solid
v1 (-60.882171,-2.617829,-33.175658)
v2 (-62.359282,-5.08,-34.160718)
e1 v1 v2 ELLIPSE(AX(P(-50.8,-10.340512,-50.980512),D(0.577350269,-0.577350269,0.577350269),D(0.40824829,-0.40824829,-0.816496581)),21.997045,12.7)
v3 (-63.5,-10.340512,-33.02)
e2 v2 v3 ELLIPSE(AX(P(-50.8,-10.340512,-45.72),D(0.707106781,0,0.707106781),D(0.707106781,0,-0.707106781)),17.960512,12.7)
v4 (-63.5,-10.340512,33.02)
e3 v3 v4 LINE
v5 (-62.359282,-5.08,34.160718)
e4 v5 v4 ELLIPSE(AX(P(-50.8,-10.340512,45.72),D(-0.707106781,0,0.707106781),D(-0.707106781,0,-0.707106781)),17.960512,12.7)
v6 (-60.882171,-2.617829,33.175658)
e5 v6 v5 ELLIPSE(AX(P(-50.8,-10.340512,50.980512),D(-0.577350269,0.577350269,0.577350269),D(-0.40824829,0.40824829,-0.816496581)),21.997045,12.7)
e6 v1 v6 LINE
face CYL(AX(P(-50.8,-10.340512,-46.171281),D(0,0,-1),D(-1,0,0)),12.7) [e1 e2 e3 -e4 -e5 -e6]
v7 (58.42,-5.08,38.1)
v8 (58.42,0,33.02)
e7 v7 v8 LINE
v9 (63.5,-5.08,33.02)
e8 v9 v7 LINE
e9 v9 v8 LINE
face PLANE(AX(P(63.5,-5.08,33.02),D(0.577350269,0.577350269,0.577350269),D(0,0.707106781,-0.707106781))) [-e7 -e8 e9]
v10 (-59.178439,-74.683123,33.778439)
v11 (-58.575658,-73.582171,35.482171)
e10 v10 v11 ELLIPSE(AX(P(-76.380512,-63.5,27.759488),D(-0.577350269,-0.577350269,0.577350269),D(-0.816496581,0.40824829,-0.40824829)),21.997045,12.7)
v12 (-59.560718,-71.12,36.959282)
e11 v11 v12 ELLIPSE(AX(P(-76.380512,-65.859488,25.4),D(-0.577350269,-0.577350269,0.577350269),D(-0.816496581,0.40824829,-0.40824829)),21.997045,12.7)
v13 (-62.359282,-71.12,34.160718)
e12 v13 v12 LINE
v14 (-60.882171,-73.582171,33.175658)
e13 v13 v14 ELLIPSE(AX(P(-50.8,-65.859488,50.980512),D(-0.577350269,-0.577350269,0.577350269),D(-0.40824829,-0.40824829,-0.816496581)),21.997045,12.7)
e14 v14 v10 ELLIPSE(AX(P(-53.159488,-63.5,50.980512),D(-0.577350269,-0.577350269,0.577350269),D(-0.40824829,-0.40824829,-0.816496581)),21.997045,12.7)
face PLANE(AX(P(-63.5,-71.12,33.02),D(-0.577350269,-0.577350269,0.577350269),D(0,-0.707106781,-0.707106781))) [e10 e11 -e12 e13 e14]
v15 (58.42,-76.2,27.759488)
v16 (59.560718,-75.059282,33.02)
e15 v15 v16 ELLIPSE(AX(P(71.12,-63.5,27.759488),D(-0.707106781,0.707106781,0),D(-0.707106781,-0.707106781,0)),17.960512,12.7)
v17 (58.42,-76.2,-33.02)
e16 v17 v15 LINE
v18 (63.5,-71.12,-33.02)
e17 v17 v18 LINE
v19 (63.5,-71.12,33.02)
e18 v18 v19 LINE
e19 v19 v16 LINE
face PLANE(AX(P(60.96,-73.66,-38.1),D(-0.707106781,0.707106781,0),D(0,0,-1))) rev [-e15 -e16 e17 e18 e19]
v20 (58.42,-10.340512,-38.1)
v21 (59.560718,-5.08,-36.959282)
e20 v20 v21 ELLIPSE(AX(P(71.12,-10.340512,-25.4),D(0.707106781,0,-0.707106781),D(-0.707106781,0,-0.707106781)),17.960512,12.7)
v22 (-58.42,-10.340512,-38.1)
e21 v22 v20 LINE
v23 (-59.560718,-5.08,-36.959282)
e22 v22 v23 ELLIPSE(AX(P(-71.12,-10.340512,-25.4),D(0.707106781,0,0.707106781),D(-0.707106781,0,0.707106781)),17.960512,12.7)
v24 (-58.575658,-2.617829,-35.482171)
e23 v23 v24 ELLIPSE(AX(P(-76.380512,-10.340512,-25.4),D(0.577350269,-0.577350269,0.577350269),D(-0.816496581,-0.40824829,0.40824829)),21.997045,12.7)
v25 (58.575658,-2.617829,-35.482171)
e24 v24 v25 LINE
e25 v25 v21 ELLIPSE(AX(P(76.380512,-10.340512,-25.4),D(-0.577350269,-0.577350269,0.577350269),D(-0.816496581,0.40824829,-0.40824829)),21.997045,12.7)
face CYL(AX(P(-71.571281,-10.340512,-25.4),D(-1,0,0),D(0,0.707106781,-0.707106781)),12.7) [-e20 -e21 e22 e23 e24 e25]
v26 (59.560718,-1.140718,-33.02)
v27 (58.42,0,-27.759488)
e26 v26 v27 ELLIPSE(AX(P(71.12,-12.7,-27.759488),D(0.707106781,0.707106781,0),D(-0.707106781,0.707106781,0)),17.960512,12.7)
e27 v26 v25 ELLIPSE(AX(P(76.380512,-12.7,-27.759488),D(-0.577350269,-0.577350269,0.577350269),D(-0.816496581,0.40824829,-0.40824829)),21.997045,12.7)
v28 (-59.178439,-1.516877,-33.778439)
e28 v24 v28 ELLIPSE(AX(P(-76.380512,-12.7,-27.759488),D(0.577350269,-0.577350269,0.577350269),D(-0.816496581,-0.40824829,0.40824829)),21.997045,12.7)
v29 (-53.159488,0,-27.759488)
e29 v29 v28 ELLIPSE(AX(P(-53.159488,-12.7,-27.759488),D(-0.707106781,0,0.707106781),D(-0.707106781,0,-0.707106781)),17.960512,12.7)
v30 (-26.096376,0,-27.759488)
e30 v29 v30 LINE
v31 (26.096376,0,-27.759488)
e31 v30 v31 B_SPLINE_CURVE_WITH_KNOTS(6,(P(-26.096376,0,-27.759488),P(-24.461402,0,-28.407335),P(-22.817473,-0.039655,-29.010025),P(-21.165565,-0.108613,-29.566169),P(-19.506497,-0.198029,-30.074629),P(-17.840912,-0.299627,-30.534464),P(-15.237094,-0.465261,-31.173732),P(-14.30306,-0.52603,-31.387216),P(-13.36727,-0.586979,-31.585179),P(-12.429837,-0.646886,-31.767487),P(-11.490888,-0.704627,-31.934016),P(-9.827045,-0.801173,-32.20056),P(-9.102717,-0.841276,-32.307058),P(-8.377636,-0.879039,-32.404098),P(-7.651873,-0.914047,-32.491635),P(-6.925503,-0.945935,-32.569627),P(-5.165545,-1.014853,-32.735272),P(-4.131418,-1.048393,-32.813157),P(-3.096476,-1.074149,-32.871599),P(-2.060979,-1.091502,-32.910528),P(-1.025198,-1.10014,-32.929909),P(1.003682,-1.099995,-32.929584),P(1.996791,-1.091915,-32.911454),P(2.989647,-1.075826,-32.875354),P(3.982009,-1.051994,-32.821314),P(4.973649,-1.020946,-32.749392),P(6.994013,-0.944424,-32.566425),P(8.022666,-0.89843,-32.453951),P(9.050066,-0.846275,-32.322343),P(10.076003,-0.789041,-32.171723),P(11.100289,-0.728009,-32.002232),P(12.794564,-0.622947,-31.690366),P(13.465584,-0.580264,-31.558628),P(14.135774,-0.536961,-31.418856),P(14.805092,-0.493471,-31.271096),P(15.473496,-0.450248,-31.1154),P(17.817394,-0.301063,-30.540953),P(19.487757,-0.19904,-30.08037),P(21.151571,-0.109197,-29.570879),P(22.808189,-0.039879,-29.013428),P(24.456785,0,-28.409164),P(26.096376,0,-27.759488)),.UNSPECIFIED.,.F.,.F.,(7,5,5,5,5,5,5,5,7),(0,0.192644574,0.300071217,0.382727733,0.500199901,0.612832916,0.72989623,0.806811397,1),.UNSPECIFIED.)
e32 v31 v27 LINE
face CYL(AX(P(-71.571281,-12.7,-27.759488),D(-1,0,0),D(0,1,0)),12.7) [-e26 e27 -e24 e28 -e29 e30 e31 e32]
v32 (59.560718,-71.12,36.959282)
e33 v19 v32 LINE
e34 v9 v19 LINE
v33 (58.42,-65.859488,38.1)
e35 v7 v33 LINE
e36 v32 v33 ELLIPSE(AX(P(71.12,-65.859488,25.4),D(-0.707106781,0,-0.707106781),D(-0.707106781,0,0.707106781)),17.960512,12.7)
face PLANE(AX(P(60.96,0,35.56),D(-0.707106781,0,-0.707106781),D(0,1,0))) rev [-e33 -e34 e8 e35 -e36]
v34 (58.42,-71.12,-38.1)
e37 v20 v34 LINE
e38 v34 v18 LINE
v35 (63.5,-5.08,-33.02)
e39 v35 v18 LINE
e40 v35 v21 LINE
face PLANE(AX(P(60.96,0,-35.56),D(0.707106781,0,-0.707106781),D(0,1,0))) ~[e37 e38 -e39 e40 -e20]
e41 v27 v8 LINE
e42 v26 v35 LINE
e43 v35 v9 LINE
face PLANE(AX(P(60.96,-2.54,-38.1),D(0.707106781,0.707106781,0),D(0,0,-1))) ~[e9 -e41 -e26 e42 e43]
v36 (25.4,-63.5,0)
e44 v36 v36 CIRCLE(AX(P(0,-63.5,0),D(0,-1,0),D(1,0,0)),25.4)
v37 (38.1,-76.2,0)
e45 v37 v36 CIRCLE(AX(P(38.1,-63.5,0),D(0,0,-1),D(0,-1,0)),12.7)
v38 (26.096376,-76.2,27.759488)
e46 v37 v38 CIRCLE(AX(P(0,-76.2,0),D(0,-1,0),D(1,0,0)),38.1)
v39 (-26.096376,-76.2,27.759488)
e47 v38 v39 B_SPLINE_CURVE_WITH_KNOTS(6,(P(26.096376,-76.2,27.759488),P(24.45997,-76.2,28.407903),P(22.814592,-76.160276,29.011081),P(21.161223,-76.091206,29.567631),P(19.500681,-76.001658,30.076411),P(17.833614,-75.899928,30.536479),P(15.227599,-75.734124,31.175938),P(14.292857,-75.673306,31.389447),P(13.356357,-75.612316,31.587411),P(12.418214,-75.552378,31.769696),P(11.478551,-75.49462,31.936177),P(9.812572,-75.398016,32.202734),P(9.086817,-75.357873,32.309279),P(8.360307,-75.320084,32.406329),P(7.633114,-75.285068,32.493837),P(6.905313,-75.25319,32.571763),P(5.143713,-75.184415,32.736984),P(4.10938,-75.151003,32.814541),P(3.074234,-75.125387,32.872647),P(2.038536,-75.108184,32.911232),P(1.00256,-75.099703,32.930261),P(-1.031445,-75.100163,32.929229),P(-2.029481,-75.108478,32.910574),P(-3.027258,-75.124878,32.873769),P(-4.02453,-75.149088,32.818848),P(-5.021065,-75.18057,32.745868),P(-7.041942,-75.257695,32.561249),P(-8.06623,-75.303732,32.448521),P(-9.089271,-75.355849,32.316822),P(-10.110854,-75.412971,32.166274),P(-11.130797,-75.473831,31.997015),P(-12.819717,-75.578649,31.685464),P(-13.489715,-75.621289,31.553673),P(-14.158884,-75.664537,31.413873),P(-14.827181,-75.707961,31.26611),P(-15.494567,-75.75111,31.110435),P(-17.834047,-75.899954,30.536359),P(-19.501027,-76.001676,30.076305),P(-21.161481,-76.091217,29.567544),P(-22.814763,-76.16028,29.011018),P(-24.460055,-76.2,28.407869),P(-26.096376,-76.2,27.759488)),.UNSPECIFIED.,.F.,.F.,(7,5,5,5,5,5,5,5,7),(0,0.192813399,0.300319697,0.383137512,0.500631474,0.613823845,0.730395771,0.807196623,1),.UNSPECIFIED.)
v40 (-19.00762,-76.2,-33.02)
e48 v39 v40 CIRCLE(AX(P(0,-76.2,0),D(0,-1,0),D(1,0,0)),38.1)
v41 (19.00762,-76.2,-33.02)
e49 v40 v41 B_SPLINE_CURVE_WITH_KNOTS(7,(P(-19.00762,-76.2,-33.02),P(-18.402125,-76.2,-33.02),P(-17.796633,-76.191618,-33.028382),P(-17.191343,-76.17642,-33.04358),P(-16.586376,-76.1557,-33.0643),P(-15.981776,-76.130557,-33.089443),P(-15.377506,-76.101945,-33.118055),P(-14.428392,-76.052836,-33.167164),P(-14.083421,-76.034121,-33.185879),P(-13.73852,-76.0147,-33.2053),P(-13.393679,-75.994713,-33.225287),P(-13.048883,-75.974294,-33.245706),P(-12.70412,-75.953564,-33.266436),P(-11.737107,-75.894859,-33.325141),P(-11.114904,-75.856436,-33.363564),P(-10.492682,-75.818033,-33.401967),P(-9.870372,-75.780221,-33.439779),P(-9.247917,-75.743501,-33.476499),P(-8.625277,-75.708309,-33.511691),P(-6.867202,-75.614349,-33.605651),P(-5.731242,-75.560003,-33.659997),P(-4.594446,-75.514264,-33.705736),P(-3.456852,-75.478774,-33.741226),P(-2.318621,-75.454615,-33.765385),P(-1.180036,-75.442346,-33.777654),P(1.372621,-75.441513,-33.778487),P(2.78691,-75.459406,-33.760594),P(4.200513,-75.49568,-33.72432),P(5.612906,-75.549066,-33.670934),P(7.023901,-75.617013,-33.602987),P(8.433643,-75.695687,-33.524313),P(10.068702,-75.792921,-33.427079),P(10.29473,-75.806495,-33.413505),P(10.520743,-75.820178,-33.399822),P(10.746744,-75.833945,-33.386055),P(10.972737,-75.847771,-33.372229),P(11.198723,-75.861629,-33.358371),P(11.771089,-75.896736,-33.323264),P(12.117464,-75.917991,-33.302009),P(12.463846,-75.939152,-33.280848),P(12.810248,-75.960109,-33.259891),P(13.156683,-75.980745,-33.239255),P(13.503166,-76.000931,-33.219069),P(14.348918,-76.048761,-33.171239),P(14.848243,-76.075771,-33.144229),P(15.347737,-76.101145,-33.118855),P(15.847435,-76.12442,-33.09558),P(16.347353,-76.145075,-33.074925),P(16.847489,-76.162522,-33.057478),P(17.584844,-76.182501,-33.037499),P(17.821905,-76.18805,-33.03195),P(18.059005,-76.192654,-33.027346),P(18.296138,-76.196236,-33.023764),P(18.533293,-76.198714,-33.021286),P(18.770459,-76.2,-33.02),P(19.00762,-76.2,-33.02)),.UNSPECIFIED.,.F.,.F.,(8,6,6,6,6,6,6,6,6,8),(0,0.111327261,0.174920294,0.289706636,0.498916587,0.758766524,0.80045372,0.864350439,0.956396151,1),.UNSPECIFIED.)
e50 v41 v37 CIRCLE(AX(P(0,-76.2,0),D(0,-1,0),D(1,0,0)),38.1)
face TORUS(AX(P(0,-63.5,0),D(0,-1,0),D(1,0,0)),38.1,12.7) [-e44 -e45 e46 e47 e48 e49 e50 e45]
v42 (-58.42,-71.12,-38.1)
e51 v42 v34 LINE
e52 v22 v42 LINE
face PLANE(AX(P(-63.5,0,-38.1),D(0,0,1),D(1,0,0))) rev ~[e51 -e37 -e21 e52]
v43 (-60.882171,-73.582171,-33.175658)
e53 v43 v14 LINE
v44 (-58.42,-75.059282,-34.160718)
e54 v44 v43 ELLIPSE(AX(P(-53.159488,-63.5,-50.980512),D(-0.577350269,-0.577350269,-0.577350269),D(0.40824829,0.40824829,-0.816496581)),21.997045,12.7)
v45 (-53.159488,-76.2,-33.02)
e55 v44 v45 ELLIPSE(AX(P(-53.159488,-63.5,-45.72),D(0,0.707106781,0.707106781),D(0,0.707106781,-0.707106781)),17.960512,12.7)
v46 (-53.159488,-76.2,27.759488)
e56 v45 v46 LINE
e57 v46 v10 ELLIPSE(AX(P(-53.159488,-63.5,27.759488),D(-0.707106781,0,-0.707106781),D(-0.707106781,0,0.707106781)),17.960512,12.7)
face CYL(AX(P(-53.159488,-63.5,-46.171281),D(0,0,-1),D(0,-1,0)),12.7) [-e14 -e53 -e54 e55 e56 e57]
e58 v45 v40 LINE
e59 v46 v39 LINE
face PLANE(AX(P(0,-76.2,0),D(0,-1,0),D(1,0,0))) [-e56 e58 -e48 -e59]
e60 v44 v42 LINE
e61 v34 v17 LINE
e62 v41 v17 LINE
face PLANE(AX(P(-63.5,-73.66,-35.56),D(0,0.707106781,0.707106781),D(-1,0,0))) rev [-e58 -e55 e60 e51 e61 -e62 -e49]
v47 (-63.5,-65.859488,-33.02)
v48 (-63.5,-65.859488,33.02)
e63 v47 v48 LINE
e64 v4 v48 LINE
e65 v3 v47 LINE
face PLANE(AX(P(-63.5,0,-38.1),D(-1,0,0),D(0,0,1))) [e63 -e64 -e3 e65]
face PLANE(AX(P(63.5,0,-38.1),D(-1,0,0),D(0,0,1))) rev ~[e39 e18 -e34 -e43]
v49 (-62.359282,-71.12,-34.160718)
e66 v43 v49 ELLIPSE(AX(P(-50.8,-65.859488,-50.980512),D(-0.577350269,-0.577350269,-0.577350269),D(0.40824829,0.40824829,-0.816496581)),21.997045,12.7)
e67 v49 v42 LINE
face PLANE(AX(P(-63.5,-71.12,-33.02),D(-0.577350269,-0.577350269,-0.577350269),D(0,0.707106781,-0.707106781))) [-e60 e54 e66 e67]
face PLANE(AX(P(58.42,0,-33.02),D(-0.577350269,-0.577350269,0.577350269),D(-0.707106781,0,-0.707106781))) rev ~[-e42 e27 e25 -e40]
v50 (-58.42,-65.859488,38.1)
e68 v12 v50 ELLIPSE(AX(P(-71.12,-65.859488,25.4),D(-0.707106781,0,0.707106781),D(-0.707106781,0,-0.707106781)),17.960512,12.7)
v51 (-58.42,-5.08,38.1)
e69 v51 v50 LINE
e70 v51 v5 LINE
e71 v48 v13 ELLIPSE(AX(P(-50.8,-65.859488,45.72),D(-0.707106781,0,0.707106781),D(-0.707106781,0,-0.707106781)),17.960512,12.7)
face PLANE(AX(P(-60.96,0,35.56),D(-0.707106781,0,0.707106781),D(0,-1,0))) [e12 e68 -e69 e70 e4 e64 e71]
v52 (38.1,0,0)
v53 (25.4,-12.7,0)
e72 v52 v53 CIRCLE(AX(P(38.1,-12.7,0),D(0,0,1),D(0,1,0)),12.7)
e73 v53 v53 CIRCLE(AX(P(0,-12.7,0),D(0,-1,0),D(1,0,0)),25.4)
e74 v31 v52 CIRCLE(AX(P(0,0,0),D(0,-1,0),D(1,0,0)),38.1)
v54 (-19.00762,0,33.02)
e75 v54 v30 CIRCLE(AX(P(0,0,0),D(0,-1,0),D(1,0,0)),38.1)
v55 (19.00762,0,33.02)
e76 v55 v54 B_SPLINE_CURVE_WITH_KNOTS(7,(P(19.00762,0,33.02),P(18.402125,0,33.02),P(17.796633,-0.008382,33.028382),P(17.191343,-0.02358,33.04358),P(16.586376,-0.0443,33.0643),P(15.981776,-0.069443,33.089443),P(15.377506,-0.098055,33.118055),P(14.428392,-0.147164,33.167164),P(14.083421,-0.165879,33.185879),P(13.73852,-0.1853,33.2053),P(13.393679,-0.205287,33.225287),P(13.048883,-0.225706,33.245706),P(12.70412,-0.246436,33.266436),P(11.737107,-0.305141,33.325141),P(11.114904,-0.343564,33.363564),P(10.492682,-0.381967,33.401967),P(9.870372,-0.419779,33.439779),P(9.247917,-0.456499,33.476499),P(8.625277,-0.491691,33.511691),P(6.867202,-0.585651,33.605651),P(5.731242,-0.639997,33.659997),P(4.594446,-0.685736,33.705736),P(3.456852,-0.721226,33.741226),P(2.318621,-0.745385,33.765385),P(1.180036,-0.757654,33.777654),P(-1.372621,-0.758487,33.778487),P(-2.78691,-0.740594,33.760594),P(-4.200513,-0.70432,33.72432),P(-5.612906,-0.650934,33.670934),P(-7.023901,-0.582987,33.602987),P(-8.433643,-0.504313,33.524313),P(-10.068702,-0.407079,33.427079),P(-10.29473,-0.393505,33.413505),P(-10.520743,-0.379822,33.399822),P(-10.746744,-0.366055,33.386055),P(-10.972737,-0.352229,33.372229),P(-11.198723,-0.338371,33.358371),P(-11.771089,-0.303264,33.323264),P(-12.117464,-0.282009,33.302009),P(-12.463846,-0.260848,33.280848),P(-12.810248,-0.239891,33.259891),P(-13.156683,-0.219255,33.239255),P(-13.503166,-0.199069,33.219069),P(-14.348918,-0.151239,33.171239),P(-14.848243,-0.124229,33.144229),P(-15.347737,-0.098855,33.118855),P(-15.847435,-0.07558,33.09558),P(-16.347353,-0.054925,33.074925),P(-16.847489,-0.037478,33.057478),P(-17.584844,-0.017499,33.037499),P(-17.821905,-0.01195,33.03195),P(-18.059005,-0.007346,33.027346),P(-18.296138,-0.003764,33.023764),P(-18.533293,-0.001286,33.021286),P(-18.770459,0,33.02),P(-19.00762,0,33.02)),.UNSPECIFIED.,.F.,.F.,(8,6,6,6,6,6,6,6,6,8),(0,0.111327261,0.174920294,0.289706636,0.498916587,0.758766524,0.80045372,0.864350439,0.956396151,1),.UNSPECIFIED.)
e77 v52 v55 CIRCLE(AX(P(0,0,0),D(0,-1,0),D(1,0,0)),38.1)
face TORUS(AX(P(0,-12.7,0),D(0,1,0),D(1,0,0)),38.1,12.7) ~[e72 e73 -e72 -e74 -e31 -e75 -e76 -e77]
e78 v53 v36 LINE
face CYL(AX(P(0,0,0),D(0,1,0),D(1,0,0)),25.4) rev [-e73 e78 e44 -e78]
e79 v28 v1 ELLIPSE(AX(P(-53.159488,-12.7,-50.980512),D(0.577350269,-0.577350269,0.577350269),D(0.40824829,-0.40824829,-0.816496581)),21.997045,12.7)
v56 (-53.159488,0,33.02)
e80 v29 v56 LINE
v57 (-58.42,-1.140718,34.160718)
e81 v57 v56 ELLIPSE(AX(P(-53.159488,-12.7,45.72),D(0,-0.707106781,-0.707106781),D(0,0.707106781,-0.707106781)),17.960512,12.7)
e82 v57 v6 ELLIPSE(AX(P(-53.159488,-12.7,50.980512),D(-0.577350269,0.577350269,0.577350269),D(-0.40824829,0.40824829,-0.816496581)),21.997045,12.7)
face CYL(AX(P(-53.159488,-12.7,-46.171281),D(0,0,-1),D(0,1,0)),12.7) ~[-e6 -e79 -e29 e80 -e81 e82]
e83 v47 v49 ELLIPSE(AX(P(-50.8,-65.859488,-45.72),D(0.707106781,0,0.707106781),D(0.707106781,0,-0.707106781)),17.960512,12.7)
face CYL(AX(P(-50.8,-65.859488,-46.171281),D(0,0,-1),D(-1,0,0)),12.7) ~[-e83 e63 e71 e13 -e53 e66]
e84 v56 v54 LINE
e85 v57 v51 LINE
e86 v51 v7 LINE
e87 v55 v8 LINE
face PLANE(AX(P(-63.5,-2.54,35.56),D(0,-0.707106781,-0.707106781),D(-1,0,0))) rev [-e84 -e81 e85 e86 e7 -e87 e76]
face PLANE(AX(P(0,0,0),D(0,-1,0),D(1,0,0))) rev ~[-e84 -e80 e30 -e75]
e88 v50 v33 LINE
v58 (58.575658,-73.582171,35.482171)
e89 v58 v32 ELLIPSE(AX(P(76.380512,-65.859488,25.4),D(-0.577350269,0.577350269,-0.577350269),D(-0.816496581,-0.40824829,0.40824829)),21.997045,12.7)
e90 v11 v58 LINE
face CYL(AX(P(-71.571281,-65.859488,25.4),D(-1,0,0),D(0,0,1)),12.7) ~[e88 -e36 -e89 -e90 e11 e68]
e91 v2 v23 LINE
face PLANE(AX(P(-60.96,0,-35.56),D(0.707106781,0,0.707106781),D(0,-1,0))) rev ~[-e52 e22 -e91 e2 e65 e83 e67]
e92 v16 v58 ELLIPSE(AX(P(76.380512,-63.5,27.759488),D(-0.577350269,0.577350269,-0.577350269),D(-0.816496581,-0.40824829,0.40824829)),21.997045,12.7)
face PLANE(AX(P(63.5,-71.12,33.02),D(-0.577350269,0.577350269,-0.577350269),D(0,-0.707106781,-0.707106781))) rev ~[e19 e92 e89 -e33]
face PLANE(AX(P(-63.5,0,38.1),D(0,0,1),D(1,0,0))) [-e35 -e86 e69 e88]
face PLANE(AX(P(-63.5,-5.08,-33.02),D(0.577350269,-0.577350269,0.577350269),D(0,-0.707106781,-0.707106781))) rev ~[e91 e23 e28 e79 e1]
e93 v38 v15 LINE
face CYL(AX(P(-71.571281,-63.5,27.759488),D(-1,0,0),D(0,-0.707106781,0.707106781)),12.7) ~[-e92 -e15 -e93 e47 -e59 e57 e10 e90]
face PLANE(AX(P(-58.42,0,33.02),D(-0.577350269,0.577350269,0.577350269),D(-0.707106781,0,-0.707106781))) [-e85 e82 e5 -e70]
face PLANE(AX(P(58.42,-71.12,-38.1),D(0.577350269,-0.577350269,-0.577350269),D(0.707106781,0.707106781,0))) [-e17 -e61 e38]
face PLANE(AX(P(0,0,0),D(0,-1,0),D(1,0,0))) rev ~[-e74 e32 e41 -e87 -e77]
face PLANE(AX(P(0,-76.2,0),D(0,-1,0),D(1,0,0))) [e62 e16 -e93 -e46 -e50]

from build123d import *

# Parameters (mm, degrees)
F0_W        = 127
F0_H        = 76.2
F0_R        = 25.4
F1_DEPTH    = 76.2
F2_SIZE     = 5.08
F3_T1_DEPTH = 143.1425612107
F3_T3_DEPTH = 92.3425612107


# Not quite as in the source:
# - a fillet or chamfer that OpenCascade refuses, or shapes differently, is made with other operations: its cross-section is extruded or revolved along the edge and cut away or added


with BuildPart() as f1:
    # F0 (on Front) → F1 (new body)
    with BuildSketch(Plane.XZ):
        Rectangle(F0_W, F0_H)
        Circle(F0_R, mode=Mode.SUBTRACT)
    extrude(amount=F1_DEPTH)

    # F2
    f2_edges = [f1.edges().sort_by_distance(p)[0] for p in [
        (0, -76.2, 38.1),
        (-63.5, -38.1, 38.1),
        (0, 0, 38.1),
        (63.5, -38.1, 38.1),
        (63.5, -76.2, 0),
        (0, -76.2, -38.1),
        (-63.5, -76.2, 0),
        (63.5, -38.1, -38.1),
        (63.5, 0, 0),
        (0, 0, -38.1),
        (-63.5, 0, 0),
        (-63.5, -38.1, -38.1),
    ]]
    chamfer(f2_edges, length=F2_SIZE)

    # F3: fillet of radius 12.7 on 10 edges, made by hand

    # F3_s2 → F3_t1 (cut)
    with BuildSketch(Plane.YZ.offset(-71.5712806053)):
        with BuildLine():
            ThreePointArc((0, -27.7594877579), (-0.9667299371, -32.6195673489), (-3.7197438789, -36.7397438789))
            Line((-3.7197438789, -36.7397438789), (0, -33.02))
            Line((0, -33.02), (0, -27.7594877579))
        make_face()
        with BuildLine():
            ThreePointArc((-1.3602561211, -34.3802561211), (-5.4804326511, -37.1332700629), (-10.3405122421, -38.1))
            Line((-10.3405122421, -38.1), (-5.08, -38.1))
            Line((-5.08, -38.1), (-1.3602561211, -34.3802561211))
        make_face()
        with BuildLine():
            ThreePointArc((-65.8594877579, 38.1), (-70.7195673489, 37.1332700629), (-74.8397438789, 34.3802561211))
            Line((-74.8397438789, 34.3802561211), (-71.12, 38.1))
            Line((-71.12, 38.1), (-65.8594877579, 38.1))
        make_face()
        with BuildLine():
            ThreePointArc((-72.4802561211, 36.7397438789), (-75.2332700629, 32.6195673489), (-76.2, 27.7594877579))
            Line((-76.2, 27.7594877579), (-76.2, 33.02))
            Line((-76.2, 33.02), (-72.4802561211, 36.7397438789))
        make_face()
    extrude(amount=F3_T1_DEPTH, mode=Mode.SUBTRACT)

    # F3_s4 → F3_t3 (cut)
    with BuildSketch(Plane.XY.offset(-46.1712806053)):
        with BuildLine():
            ThreePointArc((-63.5, -65.8594877579), (-62.5332700629, -70.7195673489), (-59.7802561211, -74.8397438789))
            Line((-59.7802561211, -74.8397438789), (-63.5, -71.12))
            Line((-63.5, -71.12), (-63.5, -65.8594877579))
        make_face()
        with BuildLine():
            ThreePointArc((-53.1594877579, -76.2), (-58.0195673489, -75.2332700629), (-62.1397438789, -72.4802561211))
            Line((-62.1397438789, -72.4802561211), (-58.42, -76.2))
            Line((-58.42, -76.2), (-53.1594877579, -76.2))
        make_face()
        with BuildLine():
            ThreePointArc((-63.5, -10.3405122421), (-62.5332700629, -5.4804326511), (-59.7802561211, -1.3602561211))
            Line((-59.7802561211, -1.3602561211), (-63.5, -5.08))
            Line((-63.5, -5.08), (-63.5, -10.3405122421))
        make_face()
        with BuildLine():
            ThreePointArc((-53.1594877579, 0), (-58.0195673489, -0.9667299371), (-62.1397438789, -3.7197438789))
            Line((-62.1397438789, -3.7197438789), (-58.42, 0))
            Line((-58.42, 0), (-53.1594877579, 0))
        make_face()
    extrude(amount=F3_T3_DEPTH, mode=Mode.SUBTRACT)

    # F3_s5 → F3_t6 (revolve, cut)
    with BuildSketch(Plane.XY):
        with BuildLine():
            ThreePointArc((38.1, -76.2), (29.1197438789, -72.4802561211), (25.4, -63.5))
            Line((25.4, -63.5), (25.4, -76.2))
            Line((25.4, -76.2), (38.1, -76.2))
        make_face()
    revolve(axis=Axis((0, -76.2, 0), (0, -1, 0)), mode=Mode.SUBTRACT)

    # F3_s7 → F3_t8 (revolve, cut)
    with BuildSketch(Plane.XY):
        with BuildLine():
            ThreePointArc((38.1, 0), (29.1197438789, -3.7197438789), (25.4, -12.7))
            Line((25.4, -12.7), (25.4, 0))
            Line((25.4, 0), (38.1, 0))
        make_face()
    revolve(axis=Axis((0, 0, 0), (0, -1, 0)), mode=Mode.SUBTRACT)


solid = f1.part
